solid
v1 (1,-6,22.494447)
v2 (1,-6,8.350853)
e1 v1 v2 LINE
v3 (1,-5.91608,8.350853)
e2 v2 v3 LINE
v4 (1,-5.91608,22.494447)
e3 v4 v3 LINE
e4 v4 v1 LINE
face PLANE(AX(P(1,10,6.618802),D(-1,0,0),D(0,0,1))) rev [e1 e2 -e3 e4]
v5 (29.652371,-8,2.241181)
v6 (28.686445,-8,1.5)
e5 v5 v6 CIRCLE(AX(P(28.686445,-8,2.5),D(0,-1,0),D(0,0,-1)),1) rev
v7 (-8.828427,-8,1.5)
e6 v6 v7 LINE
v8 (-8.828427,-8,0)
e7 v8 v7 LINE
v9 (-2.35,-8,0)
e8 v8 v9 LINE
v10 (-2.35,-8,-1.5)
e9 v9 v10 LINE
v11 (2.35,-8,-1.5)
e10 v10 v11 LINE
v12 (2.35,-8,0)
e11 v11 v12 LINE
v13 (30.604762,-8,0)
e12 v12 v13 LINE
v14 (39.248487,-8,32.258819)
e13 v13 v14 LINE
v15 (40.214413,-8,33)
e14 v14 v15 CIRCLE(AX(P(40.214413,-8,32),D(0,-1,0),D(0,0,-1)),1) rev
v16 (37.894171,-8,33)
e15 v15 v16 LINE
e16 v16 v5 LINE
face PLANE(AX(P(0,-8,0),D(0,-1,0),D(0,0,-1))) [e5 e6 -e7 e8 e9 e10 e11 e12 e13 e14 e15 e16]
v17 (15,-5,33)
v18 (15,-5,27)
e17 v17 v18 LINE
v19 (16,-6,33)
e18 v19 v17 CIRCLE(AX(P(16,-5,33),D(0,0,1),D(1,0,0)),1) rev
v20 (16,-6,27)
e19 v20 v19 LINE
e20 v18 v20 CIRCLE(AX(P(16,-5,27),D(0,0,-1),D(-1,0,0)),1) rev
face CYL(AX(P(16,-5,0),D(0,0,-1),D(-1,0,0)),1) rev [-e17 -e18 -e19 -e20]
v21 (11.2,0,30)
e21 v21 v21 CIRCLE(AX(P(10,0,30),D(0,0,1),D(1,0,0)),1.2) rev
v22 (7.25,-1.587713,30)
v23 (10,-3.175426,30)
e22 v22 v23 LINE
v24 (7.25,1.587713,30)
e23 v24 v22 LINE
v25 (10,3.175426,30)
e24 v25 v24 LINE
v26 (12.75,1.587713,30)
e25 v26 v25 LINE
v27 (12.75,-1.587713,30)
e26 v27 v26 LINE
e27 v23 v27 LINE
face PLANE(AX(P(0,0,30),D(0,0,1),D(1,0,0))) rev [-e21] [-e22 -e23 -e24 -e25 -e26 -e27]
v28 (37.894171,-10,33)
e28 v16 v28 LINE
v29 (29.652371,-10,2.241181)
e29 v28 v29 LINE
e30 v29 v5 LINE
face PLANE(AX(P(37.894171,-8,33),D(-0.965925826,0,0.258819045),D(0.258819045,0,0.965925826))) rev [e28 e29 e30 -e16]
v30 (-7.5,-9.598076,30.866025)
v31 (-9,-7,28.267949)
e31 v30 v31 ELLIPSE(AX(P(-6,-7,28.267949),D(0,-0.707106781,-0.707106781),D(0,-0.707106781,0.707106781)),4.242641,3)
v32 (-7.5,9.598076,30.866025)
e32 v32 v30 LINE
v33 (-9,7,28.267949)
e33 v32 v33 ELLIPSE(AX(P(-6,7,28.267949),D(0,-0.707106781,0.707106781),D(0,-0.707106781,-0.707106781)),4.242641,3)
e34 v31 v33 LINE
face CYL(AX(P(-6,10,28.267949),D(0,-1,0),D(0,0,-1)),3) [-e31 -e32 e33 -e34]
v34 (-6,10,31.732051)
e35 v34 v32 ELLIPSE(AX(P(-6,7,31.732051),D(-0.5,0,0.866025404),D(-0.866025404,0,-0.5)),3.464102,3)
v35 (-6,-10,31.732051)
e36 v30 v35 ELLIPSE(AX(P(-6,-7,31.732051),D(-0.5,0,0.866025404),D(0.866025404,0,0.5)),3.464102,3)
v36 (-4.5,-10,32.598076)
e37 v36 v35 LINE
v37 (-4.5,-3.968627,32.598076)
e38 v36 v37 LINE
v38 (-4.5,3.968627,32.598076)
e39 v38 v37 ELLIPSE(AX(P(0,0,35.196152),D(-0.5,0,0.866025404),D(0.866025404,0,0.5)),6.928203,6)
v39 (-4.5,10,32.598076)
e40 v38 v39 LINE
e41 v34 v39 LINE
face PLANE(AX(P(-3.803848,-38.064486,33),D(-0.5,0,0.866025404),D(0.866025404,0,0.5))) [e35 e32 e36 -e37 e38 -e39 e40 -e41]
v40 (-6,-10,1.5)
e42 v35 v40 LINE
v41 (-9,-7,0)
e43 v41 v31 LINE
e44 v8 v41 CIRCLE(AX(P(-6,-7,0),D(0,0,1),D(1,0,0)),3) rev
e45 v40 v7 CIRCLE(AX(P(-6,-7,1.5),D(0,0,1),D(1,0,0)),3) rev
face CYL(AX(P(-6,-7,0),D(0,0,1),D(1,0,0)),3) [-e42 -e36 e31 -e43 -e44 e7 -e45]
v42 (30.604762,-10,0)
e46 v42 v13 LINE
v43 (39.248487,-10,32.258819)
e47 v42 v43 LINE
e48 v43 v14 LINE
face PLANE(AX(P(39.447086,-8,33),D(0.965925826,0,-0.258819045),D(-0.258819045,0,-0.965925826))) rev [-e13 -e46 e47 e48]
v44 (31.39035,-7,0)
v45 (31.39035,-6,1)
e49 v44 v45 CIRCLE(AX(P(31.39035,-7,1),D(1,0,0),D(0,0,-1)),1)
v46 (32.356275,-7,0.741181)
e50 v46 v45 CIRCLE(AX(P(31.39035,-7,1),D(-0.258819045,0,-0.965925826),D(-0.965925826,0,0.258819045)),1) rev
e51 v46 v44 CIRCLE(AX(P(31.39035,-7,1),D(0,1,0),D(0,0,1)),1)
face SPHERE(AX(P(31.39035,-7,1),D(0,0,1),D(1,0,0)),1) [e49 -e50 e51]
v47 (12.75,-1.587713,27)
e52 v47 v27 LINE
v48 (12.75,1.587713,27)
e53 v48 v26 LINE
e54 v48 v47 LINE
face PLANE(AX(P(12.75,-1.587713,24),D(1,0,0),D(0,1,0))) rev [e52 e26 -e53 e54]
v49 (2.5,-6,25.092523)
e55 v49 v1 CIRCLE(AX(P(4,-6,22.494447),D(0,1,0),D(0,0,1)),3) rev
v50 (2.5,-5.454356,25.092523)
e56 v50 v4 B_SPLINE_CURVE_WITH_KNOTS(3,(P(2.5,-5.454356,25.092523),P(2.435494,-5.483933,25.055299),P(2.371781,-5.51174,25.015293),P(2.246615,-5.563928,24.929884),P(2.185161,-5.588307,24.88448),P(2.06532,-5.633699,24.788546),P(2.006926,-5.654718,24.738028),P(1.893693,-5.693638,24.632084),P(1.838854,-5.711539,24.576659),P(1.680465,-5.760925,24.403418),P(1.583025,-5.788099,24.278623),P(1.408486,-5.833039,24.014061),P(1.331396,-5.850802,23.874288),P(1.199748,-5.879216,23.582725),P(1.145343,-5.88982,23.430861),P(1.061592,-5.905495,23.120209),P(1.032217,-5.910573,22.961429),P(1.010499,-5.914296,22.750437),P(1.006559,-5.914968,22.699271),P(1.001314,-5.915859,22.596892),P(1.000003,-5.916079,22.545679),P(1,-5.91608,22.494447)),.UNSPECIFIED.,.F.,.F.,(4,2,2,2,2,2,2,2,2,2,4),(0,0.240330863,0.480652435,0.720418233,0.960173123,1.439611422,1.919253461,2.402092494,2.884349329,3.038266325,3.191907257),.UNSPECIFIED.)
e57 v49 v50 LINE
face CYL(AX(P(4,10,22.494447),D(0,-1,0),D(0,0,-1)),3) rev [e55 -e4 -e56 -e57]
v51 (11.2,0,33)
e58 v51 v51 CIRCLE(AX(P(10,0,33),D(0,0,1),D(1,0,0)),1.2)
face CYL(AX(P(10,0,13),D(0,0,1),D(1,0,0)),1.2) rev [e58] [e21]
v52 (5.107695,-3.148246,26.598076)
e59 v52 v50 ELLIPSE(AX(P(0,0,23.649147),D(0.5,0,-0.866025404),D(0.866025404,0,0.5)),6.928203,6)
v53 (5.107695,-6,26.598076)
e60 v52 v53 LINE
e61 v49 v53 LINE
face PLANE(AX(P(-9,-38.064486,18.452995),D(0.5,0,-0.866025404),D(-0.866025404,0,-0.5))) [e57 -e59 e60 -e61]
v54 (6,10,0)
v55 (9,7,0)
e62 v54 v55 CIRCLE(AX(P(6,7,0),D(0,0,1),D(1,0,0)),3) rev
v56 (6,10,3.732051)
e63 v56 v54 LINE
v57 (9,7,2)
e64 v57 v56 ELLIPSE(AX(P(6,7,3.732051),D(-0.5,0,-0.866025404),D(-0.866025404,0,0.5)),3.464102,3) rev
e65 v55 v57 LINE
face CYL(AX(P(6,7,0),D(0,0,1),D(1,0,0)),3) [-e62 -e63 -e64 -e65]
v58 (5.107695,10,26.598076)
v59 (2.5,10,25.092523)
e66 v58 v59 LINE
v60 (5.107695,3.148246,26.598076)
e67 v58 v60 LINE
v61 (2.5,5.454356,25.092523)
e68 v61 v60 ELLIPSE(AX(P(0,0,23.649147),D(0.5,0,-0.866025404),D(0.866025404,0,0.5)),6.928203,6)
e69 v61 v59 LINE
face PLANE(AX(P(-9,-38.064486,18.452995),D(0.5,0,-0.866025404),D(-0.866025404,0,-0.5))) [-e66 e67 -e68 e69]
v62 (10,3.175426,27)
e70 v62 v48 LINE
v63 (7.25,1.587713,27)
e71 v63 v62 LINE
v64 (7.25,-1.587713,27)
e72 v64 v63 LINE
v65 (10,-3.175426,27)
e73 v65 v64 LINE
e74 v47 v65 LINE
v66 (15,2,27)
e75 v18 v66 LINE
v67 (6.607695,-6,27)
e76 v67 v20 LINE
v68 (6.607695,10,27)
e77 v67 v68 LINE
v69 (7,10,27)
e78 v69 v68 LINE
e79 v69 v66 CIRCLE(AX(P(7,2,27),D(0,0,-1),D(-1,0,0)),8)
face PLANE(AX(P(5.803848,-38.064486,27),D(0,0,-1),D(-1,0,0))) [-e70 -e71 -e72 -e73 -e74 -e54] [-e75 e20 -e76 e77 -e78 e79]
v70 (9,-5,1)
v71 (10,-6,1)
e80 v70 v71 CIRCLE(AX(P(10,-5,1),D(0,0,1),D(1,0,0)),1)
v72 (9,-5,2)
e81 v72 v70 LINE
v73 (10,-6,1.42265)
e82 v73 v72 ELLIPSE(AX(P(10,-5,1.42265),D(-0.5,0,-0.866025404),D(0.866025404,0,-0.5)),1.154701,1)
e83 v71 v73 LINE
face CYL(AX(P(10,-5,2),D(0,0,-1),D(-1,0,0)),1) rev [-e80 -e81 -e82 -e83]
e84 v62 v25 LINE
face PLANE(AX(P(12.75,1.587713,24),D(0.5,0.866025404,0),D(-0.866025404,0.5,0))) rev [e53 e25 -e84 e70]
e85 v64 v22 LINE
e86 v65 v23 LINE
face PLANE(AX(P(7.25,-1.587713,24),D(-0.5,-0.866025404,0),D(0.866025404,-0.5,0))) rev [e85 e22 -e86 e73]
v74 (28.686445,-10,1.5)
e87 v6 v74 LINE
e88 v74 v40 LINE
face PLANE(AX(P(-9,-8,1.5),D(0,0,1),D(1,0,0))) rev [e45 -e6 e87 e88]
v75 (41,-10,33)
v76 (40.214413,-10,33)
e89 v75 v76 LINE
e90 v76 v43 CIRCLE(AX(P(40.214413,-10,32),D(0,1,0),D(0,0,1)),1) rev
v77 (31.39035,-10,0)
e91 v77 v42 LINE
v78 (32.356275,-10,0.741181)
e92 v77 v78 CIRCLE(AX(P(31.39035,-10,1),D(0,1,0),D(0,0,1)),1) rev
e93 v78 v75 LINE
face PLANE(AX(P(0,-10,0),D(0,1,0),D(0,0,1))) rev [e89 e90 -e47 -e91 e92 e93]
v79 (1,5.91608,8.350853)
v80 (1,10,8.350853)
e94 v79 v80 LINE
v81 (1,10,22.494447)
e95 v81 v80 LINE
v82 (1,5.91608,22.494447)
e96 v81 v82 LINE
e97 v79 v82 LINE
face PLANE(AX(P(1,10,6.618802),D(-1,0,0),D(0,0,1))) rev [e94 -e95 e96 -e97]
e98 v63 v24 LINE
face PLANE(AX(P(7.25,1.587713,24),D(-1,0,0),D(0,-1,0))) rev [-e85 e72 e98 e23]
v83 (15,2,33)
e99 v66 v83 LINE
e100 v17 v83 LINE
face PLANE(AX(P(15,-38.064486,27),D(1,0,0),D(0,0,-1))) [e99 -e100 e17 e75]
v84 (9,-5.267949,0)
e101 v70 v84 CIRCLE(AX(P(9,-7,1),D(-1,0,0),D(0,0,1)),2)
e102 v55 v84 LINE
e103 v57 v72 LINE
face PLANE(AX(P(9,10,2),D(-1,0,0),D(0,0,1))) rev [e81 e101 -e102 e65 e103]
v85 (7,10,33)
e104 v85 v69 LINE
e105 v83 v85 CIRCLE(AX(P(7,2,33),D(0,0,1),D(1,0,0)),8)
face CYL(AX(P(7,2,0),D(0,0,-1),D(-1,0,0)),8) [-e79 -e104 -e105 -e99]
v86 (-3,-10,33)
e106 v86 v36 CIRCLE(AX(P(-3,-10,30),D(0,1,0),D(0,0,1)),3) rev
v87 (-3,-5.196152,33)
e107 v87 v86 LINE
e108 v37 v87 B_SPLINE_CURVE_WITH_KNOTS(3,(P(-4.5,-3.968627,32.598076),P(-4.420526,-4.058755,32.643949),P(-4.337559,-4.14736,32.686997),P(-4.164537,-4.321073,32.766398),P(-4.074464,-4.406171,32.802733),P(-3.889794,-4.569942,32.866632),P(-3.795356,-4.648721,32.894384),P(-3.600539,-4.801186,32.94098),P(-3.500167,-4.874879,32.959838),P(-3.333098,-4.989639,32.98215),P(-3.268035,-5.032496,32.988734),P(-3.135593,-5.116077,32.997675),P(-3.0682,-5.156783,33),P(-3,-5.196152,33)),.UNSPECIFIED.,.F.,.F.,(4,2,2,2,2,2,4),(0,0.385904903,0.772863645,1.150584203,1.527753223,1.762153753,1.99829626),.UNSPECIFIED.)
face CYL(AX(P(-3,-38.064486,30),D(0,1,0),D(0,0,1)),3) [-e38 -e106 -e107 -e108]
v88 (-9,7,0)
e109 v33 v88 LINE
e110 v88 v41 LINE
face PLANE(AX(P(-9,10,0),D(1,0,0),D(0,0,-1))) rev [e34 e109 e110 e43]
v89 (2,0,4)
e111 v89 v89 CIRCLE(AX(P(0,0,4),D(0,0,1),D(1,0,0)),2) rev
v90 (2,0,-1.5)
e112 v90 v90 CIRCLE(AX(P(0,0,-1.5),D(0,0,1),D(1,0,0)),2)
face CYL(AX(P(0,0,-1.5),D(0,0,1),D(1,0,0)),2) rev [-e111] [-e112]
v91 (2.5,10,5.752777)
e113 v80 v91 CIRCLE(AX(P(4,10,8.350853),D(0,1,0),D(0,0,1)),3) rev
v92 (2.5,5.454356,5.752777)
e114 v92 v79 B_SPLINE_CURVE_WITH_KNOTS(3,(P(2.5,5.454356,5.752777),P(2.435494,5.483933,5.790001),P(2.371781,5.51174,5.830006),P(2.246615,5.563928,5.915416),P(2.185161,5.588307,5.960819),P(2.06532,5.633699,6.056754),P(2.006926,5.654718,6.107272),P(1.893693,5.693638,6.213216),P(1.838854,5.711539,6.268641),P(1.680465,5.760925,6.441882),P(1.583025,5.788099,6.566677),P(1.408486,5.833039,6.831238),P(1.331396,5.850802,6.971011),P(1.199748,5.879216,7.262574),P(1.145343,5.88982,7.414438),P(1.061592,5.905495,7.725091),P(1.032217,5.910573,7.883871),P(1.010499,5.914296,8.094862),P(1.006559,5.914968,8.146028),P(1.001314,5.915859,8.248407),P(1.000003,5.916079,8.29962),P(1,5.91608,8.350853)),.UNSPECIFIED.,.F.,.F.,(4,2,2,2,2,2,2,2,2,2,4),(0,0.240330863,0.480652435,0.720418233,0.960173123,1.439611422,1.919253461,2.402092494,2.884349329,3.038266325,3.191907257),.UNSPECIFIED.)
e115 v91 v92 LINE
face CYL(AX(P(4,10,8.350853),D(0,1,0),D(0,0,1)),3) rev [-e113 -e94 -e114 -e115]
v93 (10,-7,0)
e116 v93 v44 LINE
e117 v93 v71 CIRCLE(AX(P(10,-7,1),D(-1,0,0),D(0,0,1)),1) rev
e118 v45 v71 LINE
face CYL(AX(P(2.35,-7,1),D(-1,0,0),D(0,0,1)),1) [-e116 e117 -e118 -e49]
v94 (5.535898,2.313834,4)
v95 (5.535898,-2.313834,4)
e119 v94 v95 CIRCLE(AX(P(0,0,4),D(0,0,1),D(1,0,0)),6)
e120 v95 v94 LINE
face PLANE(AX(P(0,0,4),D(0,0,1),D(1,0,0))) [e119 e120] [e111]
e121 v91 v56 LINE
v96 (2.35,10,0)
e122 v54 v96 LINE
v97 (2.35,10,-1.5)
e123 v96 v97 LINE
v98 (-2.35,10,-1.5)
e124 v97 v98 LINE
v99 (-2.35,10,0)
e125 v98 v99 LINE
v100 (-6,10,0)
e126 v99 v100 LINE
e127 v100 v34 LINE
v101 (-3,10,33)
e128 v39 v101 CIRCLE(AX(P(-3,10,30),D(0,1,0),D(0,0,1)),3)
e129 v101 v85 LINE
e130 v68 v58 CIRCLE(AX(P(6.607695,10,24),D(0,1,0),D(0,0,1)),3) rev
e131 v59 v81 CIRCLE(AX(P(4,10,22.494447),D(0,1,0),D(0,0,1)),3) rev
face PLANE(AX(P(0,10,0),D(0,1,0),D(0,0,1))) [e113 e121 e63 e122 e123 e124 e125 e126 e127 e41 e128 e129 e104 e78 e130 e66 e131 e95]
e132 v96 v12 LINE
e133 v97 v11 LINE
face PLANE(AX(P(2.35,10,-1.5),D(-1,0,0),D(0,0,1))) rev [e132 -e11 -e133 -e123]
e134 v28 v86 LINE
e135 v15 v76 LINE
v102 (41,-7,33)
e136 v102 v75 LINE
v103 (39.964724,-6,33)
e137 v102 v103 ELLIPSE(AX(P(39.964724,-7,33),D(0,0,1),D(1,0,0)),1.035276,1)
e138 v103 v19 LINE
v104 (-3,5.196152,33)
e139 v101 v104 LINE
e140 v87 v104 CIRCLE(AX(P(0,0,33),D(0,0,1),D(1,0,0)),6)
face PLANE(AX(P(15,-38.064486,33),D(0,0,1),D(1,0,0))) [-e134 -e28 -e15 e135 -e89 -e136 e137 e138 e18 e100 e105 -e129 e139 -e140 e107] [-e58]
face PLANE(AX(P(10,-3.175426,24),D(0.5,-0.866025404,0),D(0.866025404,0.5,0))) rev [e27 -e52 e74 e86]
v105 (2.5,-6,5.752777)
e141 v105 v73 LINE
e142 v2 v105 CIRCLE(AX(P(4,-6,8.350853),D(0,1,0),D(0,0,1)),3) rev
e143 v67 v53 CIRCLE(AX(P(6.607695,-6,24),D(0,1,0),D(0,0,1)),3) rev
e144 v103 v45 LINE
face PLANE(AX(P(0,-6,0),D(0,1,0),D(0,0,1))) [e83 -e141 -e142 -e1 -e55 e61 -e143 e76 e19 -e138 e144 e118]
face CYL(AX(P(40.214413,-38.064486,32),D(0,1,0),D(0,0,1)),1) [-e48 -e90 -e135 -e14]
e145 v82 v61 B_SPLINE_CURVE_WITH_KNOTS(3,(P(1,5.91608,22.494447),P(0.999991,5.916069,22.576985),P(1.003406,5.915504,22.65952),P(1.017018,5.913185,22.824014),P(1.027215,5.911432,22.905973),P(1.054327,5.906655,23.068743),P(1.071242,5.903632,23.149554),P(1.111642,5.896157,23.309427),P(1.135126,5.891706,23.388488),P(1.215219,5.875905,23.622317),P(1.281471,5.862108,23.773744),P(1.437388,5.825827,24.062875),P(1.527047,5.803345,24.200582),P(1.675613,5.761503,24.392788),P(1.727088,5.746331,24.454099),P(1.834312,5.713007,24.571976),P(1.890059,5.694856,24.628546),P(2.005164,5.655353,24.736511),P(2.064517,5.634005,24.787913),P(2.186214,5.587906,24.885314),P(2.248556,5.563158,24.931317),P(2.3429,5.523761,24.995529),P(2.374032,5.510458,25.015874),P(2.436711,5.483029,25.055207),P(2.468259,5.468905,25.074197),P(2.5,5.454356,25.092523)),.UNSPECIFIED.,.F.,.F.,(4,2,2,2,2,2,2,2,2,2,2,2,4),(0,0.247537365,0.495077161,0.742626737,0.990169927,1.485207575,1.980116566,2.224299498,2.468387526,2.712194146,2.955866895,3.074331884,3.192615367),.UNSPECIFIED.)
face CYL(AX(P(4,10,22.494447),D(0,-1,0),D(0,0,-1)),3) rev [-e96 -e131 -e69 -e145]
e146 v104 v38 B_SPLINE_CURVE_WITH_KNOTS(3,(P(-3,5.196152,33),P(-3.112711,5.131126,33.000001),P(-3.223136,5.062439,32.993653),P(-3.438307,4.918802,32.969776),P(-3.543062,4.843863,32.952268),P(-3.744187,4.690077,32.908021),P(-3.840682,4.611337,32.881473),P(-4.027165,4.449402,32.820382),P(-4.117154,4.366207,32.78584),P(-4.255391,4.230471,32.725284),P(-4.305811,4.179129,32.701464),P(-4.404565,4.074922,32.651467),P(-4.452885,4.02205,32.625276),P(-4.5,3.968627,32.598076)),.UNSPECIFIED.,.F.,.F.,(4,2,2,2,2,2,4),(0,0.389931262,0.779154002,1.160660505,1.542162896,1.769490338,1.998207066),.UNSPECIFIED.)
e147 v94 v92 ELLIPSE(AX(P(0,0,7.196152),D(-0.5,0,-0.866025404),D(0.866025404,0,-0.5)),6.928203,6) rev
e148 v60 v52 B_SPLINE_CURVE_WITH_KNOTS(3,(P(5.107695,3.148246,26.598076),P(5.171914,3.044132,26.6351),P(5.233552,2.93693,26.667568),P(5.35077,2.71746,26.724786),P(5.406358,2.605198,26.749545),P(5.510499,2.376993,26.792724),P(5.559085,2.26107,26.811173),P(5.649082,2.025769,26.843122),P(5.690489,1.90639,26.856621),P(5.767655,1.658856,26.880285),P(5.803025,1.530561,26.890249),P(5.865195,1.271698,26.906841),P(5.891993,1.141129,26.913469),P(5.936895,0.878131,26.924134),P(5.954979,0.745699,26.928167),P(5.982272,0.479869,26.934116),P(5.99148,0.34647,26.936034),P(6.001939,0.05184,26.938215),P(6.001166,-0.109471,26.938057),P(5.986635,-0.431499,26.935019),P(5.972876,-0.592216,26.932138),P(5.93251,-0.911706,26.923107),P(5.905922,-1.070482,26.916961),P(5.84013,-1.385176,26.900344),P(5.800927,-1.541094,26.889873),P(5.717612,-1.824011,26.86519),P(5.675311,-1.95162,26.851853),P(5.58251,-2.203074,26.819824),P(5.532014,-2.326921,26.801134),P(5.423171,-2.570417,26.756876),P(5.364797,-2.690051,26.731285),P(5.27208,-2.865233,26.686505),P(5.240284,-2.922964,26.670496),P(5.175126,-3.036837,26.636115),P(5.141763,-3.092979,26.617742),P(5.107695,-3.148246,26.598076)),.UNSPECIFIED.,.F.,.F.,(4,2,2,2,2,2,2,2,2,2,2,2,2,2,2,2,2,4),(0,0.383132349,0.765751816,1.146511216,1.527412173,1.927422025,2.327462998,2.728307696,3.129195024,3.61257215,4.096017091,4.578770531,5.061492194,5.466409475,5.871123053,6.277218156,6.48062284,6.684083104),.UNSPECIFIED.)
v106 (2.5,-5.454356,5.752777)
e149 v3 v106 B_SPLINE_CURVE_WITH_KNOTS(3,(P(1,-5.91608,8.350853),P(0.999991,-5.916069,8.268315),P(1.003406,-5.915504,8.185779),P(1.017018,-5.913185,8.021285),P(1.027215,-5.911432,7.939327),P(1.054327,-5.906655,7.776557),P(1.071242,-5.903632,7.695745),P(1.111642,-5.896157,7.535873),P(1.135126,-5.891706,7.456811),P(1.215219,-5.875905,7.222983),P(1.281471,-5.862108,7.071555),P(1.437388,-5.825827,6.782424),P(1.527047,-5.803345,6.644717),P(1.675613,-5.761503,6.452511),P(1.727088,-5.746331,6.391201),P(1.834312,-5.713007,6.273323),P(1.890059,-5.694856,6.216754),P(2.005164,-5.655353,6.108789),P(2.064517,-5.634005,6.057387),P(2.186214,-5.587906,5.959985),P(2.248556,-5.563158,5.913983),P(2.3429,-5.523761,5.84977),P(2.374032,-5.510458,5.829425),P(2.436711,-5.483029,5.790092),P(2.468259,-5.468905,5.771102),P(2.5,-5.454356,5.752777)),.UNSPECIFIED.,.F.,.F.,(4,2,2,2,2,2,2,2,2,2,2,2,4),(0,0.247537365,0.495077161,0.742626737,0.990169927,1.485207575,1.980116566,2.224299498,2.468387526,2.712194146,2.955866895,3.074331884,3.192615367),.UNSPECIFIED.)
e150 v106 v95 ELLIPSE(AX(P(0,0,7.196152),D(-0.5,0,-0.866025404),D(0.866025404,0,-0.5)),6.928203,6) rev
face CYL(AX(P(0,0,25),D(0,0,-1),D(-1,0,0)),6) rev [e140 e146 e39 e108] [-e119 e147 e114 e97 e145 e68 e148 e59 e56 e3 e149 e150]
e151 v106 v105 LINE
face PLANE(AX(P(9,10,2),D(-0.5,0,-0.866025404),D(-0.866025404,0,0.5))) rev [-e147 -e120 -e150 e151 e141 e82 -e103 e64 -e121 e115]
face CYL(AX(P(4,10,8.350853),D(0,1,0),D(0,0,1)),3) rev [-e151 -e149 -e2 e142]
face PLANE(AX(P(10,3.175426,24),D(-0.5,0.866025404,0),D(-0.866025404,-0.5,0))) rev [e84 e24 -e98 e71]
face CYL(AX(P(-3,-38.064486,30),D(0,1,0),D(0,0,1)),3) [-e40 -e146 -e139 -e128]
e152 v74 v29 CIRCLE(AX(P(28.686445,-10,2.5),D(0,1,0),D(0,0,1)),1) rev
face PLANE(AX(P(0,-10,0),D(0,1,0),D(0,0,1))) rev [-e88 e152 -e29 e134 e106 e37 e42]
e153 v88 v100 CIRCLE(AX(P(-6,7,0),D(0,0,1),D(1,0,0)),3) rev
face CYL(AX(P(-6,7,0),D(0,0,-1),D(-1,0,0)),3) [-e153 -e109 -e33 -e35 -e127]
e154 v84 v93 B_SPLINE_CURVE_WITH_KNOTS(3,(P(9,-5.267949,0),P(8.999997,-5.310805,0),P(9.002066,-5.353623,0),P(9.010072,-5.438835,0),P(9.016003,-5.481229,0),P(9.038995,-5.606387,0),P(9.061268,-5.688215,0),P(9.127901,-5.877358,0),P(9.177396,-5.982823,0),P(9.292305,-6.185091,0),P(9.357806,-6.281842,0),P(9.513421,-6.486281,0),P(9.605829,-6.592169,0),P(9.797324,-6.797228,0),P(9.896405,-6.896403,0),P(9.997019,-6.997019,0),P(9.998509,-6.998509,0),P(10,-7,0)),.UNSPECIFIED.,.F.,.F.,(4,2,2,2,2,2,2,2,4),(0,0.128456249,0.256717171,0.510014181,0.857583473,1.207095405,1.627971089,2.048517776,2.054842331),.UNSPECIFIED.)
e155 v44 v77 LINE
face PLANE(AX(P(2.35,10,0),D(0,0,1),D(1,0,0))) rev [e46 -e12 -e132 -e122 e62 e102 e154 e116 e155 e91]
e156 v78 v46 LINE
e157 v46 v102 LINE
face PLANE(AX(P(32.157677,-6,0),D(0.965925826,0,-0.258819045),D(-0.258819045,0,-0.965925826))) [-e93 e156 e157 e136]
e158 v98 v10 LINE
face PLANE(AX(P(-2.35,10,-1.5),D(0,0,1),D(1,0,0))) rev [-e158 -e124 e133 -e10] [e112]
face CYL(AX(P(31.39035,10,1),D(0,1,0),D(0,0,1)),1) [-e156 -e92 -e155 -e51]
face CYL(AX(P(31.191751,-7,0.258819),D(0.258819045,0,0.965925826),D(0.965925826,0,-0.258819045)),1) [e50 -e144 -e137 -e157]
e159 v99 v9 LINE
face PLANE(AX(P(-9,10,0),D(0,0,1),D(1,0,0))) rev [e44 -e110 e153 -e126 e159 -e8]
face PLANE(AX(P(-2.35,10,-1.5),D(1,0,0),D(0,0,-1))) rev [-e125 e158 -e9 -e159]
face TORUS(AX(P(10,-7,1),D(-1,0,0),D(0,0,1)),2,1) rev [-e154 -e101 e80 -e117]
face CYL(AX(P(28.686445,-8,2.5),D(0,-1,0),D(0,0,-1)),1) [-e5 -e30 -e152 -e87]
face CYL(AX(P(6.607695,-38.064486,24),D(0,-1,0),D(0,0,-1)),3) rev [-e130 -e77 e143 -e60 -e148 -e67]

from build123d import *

# Parameters (mm, degrees)
BOSS_EXTRU_1_DEPTH           = 10
ENL_V_MAT_EXTRU_1_DEPTH      = 29.854594898
ENL_V_MAT_EXTRU_1_DEPTH_BACK = 29.854594898
ESQUISSE2_R                  = 2
ENL_V_START                  = 4
ESQUISSE3_R                  = 6
ENL_V_MAT_EXTRU_2_DEPTH      = 25.390139133
BOSS_EXTRU_2_REACH           = 35.257
ENL_V_START_2                = -20
ESQUISSE7_R                  = 1.2
ESQUISSE7_R_2                = 6
ENL_V_MAT_EXTRU_4_DEPTH      = 20
CONG_1_START                 = -10
CONG_1_DEPTH                 = 20
CONG_1_2_DEPTH               = 20
CONG_1_3_DEPTH               = 4.545644043
CONG_1_START_2               = 5.454355957
CONG_1_4_DEPTH               = 4.545644043
CONG_1_START_3               = -7
CONG_1_5_DEPTH               = 14
CONG_1_START_4               = 5.752776733
CONG_1_6_OUTLINE_R           = 6
CONG_1_6_DEPTH               = 28.247223267
CONG_1_START_5               = -1.5
CONG_1_7_DEPTH               = 8.118802154
BOSS_EXTRU_3_DEPTH           = 4
ENL_V_MAT_EXTRU_5_DEPTH      = 2
CONG_2_R                     = 1
CONG_3_R                     = 1
ENL_V_START_3                = -3
ENL_V_MAT_EXTRU_6_DEPTH      = 6
CONG_4_R                     = 8


with BuildPart() as part:
    # Esquisse1 → Boss.-Extru.1 (new, symmetric)
    with BuildSketch(Plane(origin=(0, 0, 0), x_dir=(1, 0, 0), z_dir=(0, 1, 0))):
        Polygon((2.35, 0), (9, 0), (9, -2), (1, -6.618802154), (1, -25), (-9, -25), (-9, 0), (-2.35, 0), (-2.35, 1.5), (2.35, 1.5), align=None)
    extrude(amount=BOSS_EXTRU_1_DEPTH, both=True)

    # Esquisse2 → Enlèv. mat.-Extru.1 (cut, two sides: drawn at the far end of the back side and taken through both)
    with BuildSketch(Plane(origin=(-1.372446517, 0, 0), x_dir=(1, 0, 0), z_dir=(0, 0, 1)).offset(-ENL_V_MAT_EXTRU_1_DEPTH_BACK)):
        with Locations((1.372446517, 0)):
            Circle(ESQUISSE2_R)
    extrude(amount=ENL_V_MAT_EXTRU_1_DEPTH + ENL_V_MAT_EXTRU_1_DEPTH_BACK, mode=Mode.SUBTRACT)

    # Esquisse3 → Enlèv. mat.-Extru.2 (cut, through all)
    with BuildSketch(Plane.XY.offset(ENL_V_START)):
        Circle(ESQUISSE3_R)
    extrude(amount=ENL_V_MAT_EXTRU_2_DEPTH, mode=Mode.SUBTRACT)

    # Boss.-Extru.2: up to this face of the body (flat: up to its plane)
    boss_extru_2_end = Plane(part.part.faces().sort_by_distance((-2.923443816, -10, 10.980550797))[0])
    # Esquisse6 → Boss.-Extru.2 (add, up to the picked face)
    with BuildSketch(Plane(origin=(0, 10, 0), x_dir=(1, 0, 0), z_dir=(0, 1, 0)), mode=Mode.PRIVATE) as boss_extru_2_sk1:
        Polygon((-9, -18.452994616), (5.803847577, -27), (15, -27), (15, -33), (-3.803847577, -33), (-9, -30), align=None)
    boss_extru_2_tool1 = split(extrude(boss_extru_2_sk1.sketch, amount=-BOSS_EXTRU_2_REACH, mode=Mode.PRIVATE), bisect_by=boss_extru_2_end, keep=Keep.BOTH, mode=Mode.PRIVATE)
    add(boss_extru_2_tool1.solids().sort_by(Axis((1.160347, 10, 28.066771), (0, -1, 0)))[0])

    # Esquisse7 → Enlèv. mat.-Extru.4 (cut)
    with BuildSketch(Plane.XY.offset(33).offset(ENL_V_START_2)):
        with Locations((10, 0)):
            Circle(ESQUISSE7_R)
        with Locations(Location((0, 0, 0), (0, 0, 230.656026391))):
            Circle(ESQUISSE7_R_2)
    extrude(amount=ENL_V_MAT_EXTRU_4_DEPTH, mode=Mode.SUBTRACT)

    # Congé1: read off the stored shape, not the designer's step
    # Congé1 outline → Congé1 (cut)
    with BuildSketch(Plane(origin=(0, 0, 0), x_dir=(1, 0, 0), z_dir=(0, 1, 0)).offset(CONG_1_START)):
        with BuildLine():
            Line((-9, -30), (-7.5, -30.866025404))
            ThreePointArc((-7.5, -30.866025404), (-8.598076211, -29.767949192), (-9, -28.267949192))
            Line((-9, -28.267949192), (-9, -30))
        make_face()
    extrude(amount=CONG_1_DEPTH, mode=Mode.SUBTRACT)

    # Cong_1 2 outline → Cong_1 2 (cut)
    with BuildSketch(Plane(origin=(0, 0, 0), x_dir=(1, 0, 0), z_dir=(0, 1, 0)).offset(CONG_1_START)):
        with BuildLine():
            Line((-3.803847577, -33), (-3, -33))
            ThreePointArc((-3, -33), (-3.776457135, -32.897777479), (-4.5, -32.598076211))
            Line((-4.5, -32.598076211), (-3.803847577, -33))
        make_face()
    extrude(amount=CONG_1_2_DEPTH, mode=Mode.SUBTRACT)

    # Cong_1 3 outline → Cong_1 3 (add)
    with BuildSketch(Plane(origin=(0, 0, 0), x_dir=(1, 0, 0), z_dir=(0, 1, 0)).offset(CONG_1_START)):
        with BuildLine():
            Line((5.803847577, -27), (6.607695155, -27))
            ThreePointArc((6.607695155, -27), (5.83123802, -26.897777479), (5.107695155, -26.598076211))
            Line((5.107695155, -26.598076211), (5.803847577, -27))
        make_face()
        with BuildLine():
            Line((1, -6.618802154), (1, -8.350852961))
            ThreePointArc((1, -8.350852961), (1.401923789, -6.850852961), (2.5, -5.75277675))
            Line((2.5, -5.75277675), (1, -6.618802154))
        make_face()
        with BuildLine():
            Line((1, -24.226497308), (2.5, -25.092522712))
            ThreePointArc((2.5, -25.092522712), (1.401923789, -23.994446501), (1, -22.494446501))
            Line((1, -22.494446501), (1, -24.226497308))
        make_face()
    extrude(amount=CONG_1_3_DEPTH)

    # Cong_1 4 outline → Cong_1 4 (add)
    with BuildSketch(Plane(origin=(0, 0, 0), x_dir=(1, 0, 0), z_dir=(0, 1, 0)).offset(CONG_1_START_2)):
        with BuildLine():
            Line((5.803847577, -27), (6.607695155, -27))
            ThreePointArc((6.607695155, -27), (5.83123802, -26.897777479), (5.107695155, -26.598076211))
            Line((5.107695155, -26.598076211), (5.803847577, -27))
        make_face()
        with BuildLine():
            Line((1, -6.618802154), (1, -8.350852961))
            ThreePointArc((1, -8.350852961), (1.401923789, -6.850852961), (2.5, -5.75277675))
            Line((2.5, -5.75277675), (1, -6.618802154))
        make_face()
        with BuildLine():
            Line((1, -24.226497308), (2.5, -25.092522712))
            ThreePointArc((2.5, -25.092522712), (1.401923789, -23.994446501), (1, -22.494446501))
            Line((1, -22.494446501), (1, -24.226497308))
        make_face()
    extrude(amount=CONG_1_4_DEPTH)

    # Cong_1 5 outline → Cong_1 5 (add)
    with BuildSketch(Plane(origin=(0, 0, 0), x_dir=(1, 0, 0), z_dir=(0, 1, 0)).offset(CONG_1_START_3)):
        with BuildLine():
            Line((5.803847577, -27), (6.607695155, -27))
            ThreePointArc((6.607695155, -27), (5.83123802, -26.897777479), (5.107695155, -26.598076211))
            Line((5.107695155, -26.598076211), (5.803847577, -27))
        make_face()
    extrude(amount=CONG_1_5_DEPTH)

    # Cong_1 6 outline → Cong_1 6 (cut)
    with BuildSketch(Plane.XY.offset(CONG_1_START_4)):
        with BuildLine():
            Line((-9, 10), (-9, 7))
            ThreePointArc((-9, 7), (-8.121320344, 9.121320344), (-6, 10))
            Line((-6, 10), (-9, 10))
        make_face()
        with BuildLine():
            ThreePointArc((-6, -10), (-8.121320344, -9.121320344), (-9, -7))
            Line((-9, -7), (-9, -10))
            Line((-9, -10), (-6, -10))
        make_face()
        with BuildLine():
            Line((15, -10), (15, -7))
            ThreePointArc((15, -7), (14.121320344, -9.121320344), (12, -10))
            Line((12, -10), (15, -10))
        make_face()
        Circle(CONG_1_6_OUTLINE_R)
    extrude(amount=CONG_1_6_DEPTH, mode=Mode.SUBTRACT)

    # Cong_1 7 outline → Cong_1 7 (cut)
    with BuildSketch(Plane.XY.offset(CONG_1_START_5)):
        with BuildLine():
            Line((-9, 10), (-9, 7))
            ThreePointArc((-9, 7), (-8.121320344, 9.121320344), (-6, 10))
            Line((-6, 10), (-9, 10))
        make_face()
        with BuildLine():
            ThreePointArc((-6, -10), (-8.121320344, -9.121320344), (-9, -7))
            Line((-9, -7), (-9, -10))
            Line((-9, -10), (-6, -10))
        make_face()
        with BuildLine():
            Line((9, 10), (6, 10))
            ThreePointArc((6, 10), (8.121320344, 9.121320344), (9, 7))
            Line((9, 7), (9, 10))
        make_face()
        with BuildLine():
            ThreePointArc((9, -7), (8.121320344, -9.121320344), (6, -10))
            Line((6, -10), (9, -10))
            Line((9, -10), (9, -7))
        make_face()
    extrude(amount=CONG_1_7_DEPTH, mode=Mode.SUBTRACT)

    # Esquisse8 → Boss.-Extru.3 (add)
    with BuildSketch(Plane.XZ.offset(10)):
        Polygon((-2.35, 0), (32.15767665, 0), (41, 33), (-2.35, 33), align=None)
    extrude(amount=-BOSS_EXTRU_3_DEPTH)

    # Esquisse9 → Enlèv. mat.-Extru.5 (cut)
    with BuildSketch(Plane.XZ.offset(10)):
        Polygon((-9, 1.5), (29.453771897, 1.5), (37.894171459, 33), (39.447085729, 33), (30.202838591, -1.5), (-9, -1.5), align=None)
    extrude(amount=-ENL_V_MAT_EXTRU_5_DEPTH, mode=Mode.SUBTRACT)

    # Congé2
    cong_2_edges = [part.edges().sort_by_distance(p)[0] for p in [
        (39.447085729, -9, 33),
        (29.453771897, -9, 1.5),
        (32.15767665, -8, 0),
        (36.578838325, -6, 16.5),
        (15, -6, 30),
        (20.578838325, -6, 0),
    ]]
    fillet(cong_2_edges, radius=CONG_2_R)

    # Congé3
    cong_3_edges = [part.edges().sort_by_distance(p)[0] for p in [
        (9, -6, 1.5),
        (9, -6.292893219, 0.292893219),
    ]]
    fillet(cong_3_edges, radius=CONG_3_R)

    # Esquisse10 → Enlèv. mat.-Extru.6 (cut)
    with BuildSketch(Plane.XY.offset(33).offset(ENL_V_START_3)):
        Polygon((12.75, 1.58771324), (10, 3.175426481), (7.25, 1.58771324), (7.25, -1.58771324), (10, -3.175426481), (12.75, -1.58771324), align=None)
    extrude(amount=-ENL_V_MAT_EXTRU_6_DEPTH, mode=Mode.SUBTRACT)

    # Congé4
    cong_4_edges = [part.edges().sort_by_distance(p)[0] for p in [
        (15, 10, 30),
    ]]
    fillet(cong_4_edges, radius=CONG_4_R)


solid = part.part
